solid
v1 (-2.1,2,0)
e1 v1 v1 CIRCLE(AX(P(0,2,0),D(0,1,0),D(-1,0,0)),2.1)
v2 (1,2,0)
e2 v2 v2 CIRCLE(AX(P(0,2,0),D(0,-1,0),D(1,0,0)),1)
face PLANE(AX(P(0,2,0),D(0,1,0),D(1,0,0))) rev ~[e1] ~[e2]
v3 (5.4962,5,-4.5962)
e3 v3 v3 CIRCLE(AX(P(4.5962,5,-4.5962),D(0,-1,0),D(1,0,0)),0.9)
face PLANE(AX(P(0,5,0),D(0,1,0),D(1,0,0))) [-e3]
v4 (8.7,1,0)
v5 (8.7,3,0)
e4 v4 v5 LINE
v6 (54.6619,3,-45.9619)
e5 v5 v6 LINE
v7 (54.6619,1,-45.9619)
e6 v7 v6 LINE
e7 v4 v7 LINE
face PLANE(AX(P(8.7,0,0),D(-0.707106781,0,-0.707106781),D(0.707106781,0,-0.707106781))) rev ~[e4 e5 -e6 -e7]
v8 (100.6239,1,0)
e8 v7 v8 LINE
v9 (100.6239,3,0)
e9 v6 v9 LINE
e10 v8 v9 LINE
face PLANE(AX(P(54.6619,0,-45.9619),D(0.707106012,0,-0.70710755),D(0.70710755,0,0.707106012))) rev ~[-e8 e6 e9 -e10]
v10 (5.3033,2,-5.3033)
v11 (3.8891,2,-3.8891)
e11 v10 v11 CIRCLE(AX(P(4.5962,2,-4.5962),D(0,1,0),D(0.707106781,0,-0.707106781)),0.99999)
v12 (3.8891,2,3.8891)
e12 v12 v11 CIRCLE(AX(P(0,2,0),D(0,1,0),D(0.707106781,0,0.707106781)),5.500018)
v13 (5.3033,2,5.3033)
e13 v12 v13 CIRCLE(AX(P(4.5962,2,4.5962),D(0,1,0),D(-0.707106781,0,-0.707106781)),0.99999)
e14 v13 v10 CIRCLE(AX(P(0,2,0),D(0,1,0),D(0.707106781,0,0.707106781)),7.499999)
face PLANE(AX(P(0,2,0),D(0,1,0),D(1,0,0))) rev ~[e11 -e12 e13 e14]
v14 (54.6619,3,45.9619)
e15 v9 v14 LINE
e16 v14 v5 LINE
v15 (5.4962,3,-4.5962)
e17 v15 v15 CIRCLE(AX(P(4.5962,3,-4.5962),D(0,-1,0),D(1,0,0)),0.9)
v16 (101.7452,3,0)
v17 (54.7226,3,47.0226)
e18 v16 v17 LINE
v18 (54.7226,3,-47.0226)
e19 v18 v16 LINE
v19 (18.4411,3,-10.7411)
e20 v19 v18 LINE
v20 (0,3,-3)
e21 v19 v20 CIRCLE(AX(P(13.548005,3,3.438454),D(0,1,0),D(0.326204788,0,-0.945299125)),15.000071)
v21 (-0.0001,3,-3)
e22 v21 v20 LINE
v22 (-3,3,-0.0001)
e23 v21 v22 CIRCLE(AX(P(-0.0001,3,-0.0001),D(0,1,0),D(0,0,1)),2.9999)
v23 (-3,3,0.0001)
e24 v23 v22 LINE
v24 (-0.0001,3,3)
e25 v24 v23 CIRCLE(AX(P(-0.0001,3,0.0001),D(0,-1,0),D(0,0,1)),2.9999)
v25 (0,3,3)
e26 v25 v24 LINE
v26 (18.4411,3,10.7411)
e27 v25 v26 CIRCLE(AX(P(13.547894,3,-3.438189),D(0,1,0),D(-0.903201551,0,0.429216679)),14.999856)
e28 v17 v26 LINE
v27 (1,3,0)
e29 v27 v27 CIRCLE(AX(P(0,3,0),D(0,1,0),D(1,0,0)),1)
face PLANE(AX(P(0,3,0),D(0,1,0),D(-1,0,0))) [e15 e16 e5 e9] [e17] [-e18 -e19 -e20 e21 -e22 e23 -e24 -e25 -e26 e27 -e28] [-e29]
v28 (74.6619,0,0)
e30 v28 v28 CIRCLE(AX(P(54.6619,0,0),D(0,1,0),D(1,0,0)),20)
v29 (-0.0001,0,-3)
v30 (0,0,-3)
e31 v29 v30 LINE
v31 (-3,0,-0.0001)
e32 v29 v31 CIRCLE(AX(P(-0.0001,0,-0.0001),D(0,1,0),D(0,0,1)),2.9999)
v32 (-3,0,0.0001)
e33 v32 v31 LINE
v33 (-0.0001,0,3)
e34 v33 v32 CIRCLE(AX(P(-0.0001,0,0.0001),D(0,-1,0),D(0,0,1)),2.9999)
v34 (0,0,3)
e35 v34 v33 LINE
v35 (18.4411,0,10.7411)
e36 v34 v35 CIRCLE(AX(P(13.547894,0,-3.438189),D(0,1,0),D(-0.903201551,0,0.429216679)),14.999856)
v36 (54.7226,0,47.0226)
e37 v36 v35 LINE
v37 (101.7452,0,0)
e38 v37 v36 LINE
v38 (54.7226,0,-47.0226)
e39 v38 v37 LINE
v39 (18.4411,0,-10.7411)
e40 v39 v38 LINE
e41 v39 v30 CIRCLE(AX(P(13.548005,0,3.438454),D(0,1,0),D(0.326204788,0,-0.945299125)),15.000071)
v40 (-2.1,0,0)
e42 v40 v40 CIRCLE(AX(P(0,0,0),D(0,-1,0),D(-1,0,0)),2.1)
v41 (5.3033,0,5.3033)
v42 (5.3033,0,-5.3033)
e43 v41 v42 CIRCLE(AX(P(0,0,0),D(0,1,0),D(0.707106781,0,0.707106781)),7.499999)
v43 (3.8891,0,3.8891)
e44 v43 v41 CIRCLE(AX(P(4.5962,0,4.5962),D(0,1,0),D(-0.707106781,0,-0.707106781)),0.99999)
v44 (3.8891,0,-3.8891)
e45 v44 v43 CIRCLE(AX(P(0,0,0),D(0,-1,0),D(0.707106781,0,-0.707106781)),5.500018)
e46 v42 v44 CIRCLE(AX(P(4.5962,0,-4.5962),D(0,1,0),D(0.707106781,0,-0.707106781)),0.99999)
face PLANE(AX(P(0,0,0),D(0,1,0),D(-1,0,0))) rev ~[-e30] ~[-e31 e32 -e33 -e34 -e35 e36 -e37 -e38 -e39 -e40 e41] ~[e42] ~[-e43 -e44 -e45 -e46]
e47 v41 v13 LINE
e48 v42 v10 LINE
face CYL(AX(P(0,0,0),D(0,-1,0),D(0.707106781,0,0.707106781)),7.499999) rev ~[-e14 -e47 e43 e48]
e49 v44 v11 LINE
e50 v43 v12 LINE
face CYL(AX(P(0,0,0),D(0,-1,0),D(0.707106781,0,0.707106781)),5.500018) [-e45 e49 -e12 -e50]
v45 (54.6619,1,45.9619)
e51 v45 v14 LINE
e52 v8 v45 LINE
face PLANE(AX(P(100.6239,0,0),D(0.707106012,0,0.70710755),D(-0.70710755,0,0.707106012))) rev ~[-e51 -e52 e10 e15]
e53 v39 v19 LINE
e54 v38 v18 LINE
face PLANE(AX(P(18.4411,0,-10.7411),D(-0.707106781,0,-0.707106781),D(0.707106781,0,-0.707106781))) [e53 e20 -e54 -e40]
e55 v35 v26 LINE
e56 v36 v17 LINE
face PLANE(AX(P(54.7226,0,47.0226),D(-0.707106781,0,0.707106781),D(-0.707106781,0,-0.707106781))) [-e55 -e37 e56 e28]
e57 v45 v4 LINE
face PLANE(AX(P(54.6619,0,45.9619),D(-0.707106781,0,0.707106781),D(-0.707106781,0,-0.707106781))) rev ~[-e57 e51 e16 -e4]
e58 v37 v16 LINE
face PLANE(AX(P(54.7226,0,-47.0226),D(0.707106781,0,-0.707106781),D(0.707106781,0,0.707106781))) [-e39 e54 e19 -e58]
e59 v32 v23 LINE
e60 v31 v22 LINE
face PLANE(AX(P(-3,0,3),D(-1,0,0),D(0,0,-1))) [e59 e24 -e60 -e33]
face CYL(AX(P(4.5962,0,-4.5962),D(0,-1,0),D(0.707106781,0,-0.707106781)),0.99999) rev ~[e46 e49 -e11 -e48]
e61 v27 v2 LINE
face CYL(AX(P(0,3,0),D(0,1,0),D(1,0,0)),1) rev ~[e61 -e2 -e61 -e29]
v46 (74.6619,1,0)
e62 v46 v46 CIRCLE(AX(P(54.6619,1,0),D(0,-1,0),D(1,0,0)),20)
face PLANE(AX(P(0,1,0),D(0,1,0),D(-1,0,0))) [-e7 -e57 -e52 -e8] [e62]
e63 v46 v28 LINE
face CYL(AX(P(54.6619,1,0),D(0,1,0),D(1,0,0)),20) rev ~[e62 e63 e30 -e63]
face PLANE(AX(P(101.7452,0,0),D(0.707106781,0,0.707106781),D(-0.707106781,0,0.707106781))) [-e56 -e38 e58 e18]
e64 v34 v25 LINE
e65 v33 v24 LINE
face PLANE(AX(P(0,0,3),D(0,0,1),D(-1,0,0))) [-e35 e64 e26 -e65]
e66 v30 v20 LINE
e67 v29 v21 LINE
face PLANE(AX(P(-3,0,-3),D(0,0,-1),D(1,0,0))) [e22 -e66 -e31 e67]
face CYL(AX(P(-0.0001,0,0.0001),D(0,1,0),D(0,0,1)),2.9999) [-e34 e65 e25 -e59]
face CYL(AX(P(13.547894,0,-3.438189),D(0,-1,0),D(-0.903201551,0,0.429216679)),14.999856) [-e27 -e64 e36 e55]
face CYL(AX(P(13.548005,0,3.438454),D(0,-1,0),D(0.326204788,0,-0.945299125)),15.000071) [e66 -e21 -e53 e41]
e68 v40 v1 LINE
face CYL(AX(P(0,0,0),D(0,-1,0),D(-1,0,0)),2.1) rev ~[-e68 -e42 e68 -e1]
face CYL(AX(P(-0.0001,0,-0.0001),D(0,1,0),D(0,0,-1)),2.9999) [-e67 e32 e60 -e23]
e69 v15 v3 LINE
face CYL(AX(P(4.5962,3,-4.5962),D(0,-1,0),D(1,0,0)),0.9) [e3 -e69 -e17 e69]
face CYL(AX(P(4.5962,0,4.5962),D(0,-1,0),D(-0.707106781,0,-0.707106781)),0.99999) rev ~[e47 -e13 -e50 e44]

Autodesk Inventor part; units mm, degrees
ref_plane "YZ Plane" through (0, 0, 0) normal (1, 0, 0) x (0, 1, 0)
ref_plane "XZ Plane" through (0, 0, 0) normal (0, 1, 0) x (-1, 0, 0)
ref_plane "XY Plane" through (0, 0, 0) normal (0, 0, 1) x (1, 0, 0)
sketch "Szkic4" plane through (0, 0, 0) normal (0, 1, 0) x (-1, 0, 0)
  circle A0 centre (0, 0) radius 2.1
  line L0 (-3, 3) -> (3, 3)
  line L1 (3, 3) -> (3, -3)
  line L2 (3, -3) -> (-3, -3)
  line L3 (-3, -3) -> (-3, 3)
  line L4 (-3, 3) -> (3, -3) construction
  line L5 (3, 3) -> (-3, -3) construction
  line L6 (0, 0) -> (-4.5962, -4.5962)
  line L7 (0, 0) -> (6.5, 0) construction
  line L8 (0, 0) -> (-4.5962, 4.5962)
  line L9 (0, 0) -> (6.5, 0) construction
  arc A1 (-4.5962, 4.5962) -> (-4.5962, -4.5962) centre (0, 0) ccw construction
  arc A2 (-5.3033, 5.3033) -> (-5.3033, -5.3033) centre (0, 0) ccw
  arc A3 (-3.8891, 3.8891) -> (-3.8891, -3.8891) centre (0, 0) ccw
  arc A4 (-3.8891, 3.8891) -> (-5.3033, 5.3033) centre (-4.5962, 4.5962) ccw
  arc A5 (-5.3033, -5.3033) -> (-3.8891, -3.8891) centre (-4.5962, -4.5962) ccw
  line L10 (0, 0) -> (-7.7, 0)
  line L11 (0, 0) -> (7.7, 0) construction
  line L12 (-7.7, 0) -> (-54.7226, -47.0226)
  line L13 (-54.7226, -47.0226) -> (-101.7452, 0)
  line L14 (-101.7452, 0) -> (-54.7226, 47.0226)
  line L15 (-54.7226, 47.0226) -> (-7.7, 0)
  line L16 (-7.7, 0) -> (58.8, 0) construction
  line L17 (-7.7, 0) -> (-8.7, 0)
  line L18 (-8.7, 0) -> (-54.6619, -45.9619)
  line L19 (-54.6619, -45.9619) -> (-100.6239, 0)
  line L20 (-100.6239, 0) -> (-54.6619, 45.9619)
  line L21 (-54.6619, 45.9619) -> (-8.7, 0)
  line L22 (-8.7, 0) -> (56.3, 0) construction
  arc A6 (-18.4411, -10.7411) -> (0, -3) centre (-13.548, 3.4383) ccw
  arc A7 (0, 3) -> (-18.4411, 10.7411) centre (-13.548, -3.4383) ccw
  point P0 (-18.4411, 10.7411)
  point P1 (0, 3)
  point P2 (-3, 0)
  dimension "d52" = 4.2
  dimension "d53" = 6
  dimension "d54" = 6
  dimension "d55" = 6.5
  dimension "d56" = 135
  dimension "d57" = 6.5
  dimension "d58" = 135
  dimension "d59" = 6.5
  dimension "d60" = 2
  dimension "d61" = 7.7
  dimension "d62" = 180
  dimension "d67" = 66.5
  dimension "d68" = 135
  dimension "d69" = 66.5
  dimension "d70" = 1
  dimension "d71" = 65
  dimension "d72" = 135
  dimension "d73" = 65
  dimension "d74" = 20
  dimension "d75" = 15
extrude "Wyciągnięcie proste4" add sketch "Szkic4" along normal blind 3 contours A0 L8 L0 L1 L2 L6 | A0 L10 L3 L8 | L6 L3 L10 A0 | L8 A4 A2 L10 L15 A7 L0 | L3 L10 A3 L8 | L6 A3 L10 L3 | L2 A6 L12 L10 A2 A5 L6 | L15 L12 L13 L14
extrude "Wyciągnięcie proste5" add sketch "Szkic4" along normal blind 1 contours L18 L19 L20 L21
surface extrude "PowWyciągnięciaProstego2" sketch "Szkic4" along normal blind 5.5 shown no curves A3 A4 A2 A5
fillet "Zaokrąglenie1" radius 3 2 edges at (-3, 1.5, 3) (-3, 1.5, -3)
sketch "Szkic5" plane through (0, 1, 0) normal (0, 1, 0) x (1, 0, 0)
  line L0 (8.7, 0) -> (54.6619, 45.9619) projected
  line L1 (8.7, 0) -> (100.6239, 0)
  circle A0 centre (54.6619, 0) radius 20
  point P0 (0, 0)
  dimension "d84" = 40
extrude "Wyciągnięcie proste6" cut sketch "Szkic5" against normal blind 10
sketch "Szkic6" plane through (0, 3, 0) normal (0, 1, 0) x (1, 0, 0)
  arc A0 (3.8891, -3.8891) -> (3.8891, 3.8891) centre (0, 0) ccw projected
  arc A1 (3.8891, -3.8891) -> (5.3033, -5.3033) centre (4.5962, -4.5962) ccw projected
  arc A2 (5.3033, -5.3033) -> (5.3033, 5.3033) centre (0, 0) ccw projected
  arc A3 (5.3033, 5.3033) -> (3.8891, 3.8891) centre (4.5962, 4.5962) ccw projected
  line L0 (0, 0) -> (4.5962, 4.5962)
  circle A4 centre (4.5962, 4.5962) radius 0.9
  circle A5 centre (0, 0) radius 2.1
  circle A6 centre (0, 0) radius 1
  point P0 (0, 0)
  dimension "d87" = 1.8
  dimension "d92" = 2
extrude "Wyciągnięcie proste7" add sketch "Szkic6" against normal blind 1 contours A0 A3 A2 A1 | A4 | A5
extrude "Wyciągnięcie proste8" add sketch "Szkic6" along normal blind 2 contours A4
properties part number "flowerstand"
